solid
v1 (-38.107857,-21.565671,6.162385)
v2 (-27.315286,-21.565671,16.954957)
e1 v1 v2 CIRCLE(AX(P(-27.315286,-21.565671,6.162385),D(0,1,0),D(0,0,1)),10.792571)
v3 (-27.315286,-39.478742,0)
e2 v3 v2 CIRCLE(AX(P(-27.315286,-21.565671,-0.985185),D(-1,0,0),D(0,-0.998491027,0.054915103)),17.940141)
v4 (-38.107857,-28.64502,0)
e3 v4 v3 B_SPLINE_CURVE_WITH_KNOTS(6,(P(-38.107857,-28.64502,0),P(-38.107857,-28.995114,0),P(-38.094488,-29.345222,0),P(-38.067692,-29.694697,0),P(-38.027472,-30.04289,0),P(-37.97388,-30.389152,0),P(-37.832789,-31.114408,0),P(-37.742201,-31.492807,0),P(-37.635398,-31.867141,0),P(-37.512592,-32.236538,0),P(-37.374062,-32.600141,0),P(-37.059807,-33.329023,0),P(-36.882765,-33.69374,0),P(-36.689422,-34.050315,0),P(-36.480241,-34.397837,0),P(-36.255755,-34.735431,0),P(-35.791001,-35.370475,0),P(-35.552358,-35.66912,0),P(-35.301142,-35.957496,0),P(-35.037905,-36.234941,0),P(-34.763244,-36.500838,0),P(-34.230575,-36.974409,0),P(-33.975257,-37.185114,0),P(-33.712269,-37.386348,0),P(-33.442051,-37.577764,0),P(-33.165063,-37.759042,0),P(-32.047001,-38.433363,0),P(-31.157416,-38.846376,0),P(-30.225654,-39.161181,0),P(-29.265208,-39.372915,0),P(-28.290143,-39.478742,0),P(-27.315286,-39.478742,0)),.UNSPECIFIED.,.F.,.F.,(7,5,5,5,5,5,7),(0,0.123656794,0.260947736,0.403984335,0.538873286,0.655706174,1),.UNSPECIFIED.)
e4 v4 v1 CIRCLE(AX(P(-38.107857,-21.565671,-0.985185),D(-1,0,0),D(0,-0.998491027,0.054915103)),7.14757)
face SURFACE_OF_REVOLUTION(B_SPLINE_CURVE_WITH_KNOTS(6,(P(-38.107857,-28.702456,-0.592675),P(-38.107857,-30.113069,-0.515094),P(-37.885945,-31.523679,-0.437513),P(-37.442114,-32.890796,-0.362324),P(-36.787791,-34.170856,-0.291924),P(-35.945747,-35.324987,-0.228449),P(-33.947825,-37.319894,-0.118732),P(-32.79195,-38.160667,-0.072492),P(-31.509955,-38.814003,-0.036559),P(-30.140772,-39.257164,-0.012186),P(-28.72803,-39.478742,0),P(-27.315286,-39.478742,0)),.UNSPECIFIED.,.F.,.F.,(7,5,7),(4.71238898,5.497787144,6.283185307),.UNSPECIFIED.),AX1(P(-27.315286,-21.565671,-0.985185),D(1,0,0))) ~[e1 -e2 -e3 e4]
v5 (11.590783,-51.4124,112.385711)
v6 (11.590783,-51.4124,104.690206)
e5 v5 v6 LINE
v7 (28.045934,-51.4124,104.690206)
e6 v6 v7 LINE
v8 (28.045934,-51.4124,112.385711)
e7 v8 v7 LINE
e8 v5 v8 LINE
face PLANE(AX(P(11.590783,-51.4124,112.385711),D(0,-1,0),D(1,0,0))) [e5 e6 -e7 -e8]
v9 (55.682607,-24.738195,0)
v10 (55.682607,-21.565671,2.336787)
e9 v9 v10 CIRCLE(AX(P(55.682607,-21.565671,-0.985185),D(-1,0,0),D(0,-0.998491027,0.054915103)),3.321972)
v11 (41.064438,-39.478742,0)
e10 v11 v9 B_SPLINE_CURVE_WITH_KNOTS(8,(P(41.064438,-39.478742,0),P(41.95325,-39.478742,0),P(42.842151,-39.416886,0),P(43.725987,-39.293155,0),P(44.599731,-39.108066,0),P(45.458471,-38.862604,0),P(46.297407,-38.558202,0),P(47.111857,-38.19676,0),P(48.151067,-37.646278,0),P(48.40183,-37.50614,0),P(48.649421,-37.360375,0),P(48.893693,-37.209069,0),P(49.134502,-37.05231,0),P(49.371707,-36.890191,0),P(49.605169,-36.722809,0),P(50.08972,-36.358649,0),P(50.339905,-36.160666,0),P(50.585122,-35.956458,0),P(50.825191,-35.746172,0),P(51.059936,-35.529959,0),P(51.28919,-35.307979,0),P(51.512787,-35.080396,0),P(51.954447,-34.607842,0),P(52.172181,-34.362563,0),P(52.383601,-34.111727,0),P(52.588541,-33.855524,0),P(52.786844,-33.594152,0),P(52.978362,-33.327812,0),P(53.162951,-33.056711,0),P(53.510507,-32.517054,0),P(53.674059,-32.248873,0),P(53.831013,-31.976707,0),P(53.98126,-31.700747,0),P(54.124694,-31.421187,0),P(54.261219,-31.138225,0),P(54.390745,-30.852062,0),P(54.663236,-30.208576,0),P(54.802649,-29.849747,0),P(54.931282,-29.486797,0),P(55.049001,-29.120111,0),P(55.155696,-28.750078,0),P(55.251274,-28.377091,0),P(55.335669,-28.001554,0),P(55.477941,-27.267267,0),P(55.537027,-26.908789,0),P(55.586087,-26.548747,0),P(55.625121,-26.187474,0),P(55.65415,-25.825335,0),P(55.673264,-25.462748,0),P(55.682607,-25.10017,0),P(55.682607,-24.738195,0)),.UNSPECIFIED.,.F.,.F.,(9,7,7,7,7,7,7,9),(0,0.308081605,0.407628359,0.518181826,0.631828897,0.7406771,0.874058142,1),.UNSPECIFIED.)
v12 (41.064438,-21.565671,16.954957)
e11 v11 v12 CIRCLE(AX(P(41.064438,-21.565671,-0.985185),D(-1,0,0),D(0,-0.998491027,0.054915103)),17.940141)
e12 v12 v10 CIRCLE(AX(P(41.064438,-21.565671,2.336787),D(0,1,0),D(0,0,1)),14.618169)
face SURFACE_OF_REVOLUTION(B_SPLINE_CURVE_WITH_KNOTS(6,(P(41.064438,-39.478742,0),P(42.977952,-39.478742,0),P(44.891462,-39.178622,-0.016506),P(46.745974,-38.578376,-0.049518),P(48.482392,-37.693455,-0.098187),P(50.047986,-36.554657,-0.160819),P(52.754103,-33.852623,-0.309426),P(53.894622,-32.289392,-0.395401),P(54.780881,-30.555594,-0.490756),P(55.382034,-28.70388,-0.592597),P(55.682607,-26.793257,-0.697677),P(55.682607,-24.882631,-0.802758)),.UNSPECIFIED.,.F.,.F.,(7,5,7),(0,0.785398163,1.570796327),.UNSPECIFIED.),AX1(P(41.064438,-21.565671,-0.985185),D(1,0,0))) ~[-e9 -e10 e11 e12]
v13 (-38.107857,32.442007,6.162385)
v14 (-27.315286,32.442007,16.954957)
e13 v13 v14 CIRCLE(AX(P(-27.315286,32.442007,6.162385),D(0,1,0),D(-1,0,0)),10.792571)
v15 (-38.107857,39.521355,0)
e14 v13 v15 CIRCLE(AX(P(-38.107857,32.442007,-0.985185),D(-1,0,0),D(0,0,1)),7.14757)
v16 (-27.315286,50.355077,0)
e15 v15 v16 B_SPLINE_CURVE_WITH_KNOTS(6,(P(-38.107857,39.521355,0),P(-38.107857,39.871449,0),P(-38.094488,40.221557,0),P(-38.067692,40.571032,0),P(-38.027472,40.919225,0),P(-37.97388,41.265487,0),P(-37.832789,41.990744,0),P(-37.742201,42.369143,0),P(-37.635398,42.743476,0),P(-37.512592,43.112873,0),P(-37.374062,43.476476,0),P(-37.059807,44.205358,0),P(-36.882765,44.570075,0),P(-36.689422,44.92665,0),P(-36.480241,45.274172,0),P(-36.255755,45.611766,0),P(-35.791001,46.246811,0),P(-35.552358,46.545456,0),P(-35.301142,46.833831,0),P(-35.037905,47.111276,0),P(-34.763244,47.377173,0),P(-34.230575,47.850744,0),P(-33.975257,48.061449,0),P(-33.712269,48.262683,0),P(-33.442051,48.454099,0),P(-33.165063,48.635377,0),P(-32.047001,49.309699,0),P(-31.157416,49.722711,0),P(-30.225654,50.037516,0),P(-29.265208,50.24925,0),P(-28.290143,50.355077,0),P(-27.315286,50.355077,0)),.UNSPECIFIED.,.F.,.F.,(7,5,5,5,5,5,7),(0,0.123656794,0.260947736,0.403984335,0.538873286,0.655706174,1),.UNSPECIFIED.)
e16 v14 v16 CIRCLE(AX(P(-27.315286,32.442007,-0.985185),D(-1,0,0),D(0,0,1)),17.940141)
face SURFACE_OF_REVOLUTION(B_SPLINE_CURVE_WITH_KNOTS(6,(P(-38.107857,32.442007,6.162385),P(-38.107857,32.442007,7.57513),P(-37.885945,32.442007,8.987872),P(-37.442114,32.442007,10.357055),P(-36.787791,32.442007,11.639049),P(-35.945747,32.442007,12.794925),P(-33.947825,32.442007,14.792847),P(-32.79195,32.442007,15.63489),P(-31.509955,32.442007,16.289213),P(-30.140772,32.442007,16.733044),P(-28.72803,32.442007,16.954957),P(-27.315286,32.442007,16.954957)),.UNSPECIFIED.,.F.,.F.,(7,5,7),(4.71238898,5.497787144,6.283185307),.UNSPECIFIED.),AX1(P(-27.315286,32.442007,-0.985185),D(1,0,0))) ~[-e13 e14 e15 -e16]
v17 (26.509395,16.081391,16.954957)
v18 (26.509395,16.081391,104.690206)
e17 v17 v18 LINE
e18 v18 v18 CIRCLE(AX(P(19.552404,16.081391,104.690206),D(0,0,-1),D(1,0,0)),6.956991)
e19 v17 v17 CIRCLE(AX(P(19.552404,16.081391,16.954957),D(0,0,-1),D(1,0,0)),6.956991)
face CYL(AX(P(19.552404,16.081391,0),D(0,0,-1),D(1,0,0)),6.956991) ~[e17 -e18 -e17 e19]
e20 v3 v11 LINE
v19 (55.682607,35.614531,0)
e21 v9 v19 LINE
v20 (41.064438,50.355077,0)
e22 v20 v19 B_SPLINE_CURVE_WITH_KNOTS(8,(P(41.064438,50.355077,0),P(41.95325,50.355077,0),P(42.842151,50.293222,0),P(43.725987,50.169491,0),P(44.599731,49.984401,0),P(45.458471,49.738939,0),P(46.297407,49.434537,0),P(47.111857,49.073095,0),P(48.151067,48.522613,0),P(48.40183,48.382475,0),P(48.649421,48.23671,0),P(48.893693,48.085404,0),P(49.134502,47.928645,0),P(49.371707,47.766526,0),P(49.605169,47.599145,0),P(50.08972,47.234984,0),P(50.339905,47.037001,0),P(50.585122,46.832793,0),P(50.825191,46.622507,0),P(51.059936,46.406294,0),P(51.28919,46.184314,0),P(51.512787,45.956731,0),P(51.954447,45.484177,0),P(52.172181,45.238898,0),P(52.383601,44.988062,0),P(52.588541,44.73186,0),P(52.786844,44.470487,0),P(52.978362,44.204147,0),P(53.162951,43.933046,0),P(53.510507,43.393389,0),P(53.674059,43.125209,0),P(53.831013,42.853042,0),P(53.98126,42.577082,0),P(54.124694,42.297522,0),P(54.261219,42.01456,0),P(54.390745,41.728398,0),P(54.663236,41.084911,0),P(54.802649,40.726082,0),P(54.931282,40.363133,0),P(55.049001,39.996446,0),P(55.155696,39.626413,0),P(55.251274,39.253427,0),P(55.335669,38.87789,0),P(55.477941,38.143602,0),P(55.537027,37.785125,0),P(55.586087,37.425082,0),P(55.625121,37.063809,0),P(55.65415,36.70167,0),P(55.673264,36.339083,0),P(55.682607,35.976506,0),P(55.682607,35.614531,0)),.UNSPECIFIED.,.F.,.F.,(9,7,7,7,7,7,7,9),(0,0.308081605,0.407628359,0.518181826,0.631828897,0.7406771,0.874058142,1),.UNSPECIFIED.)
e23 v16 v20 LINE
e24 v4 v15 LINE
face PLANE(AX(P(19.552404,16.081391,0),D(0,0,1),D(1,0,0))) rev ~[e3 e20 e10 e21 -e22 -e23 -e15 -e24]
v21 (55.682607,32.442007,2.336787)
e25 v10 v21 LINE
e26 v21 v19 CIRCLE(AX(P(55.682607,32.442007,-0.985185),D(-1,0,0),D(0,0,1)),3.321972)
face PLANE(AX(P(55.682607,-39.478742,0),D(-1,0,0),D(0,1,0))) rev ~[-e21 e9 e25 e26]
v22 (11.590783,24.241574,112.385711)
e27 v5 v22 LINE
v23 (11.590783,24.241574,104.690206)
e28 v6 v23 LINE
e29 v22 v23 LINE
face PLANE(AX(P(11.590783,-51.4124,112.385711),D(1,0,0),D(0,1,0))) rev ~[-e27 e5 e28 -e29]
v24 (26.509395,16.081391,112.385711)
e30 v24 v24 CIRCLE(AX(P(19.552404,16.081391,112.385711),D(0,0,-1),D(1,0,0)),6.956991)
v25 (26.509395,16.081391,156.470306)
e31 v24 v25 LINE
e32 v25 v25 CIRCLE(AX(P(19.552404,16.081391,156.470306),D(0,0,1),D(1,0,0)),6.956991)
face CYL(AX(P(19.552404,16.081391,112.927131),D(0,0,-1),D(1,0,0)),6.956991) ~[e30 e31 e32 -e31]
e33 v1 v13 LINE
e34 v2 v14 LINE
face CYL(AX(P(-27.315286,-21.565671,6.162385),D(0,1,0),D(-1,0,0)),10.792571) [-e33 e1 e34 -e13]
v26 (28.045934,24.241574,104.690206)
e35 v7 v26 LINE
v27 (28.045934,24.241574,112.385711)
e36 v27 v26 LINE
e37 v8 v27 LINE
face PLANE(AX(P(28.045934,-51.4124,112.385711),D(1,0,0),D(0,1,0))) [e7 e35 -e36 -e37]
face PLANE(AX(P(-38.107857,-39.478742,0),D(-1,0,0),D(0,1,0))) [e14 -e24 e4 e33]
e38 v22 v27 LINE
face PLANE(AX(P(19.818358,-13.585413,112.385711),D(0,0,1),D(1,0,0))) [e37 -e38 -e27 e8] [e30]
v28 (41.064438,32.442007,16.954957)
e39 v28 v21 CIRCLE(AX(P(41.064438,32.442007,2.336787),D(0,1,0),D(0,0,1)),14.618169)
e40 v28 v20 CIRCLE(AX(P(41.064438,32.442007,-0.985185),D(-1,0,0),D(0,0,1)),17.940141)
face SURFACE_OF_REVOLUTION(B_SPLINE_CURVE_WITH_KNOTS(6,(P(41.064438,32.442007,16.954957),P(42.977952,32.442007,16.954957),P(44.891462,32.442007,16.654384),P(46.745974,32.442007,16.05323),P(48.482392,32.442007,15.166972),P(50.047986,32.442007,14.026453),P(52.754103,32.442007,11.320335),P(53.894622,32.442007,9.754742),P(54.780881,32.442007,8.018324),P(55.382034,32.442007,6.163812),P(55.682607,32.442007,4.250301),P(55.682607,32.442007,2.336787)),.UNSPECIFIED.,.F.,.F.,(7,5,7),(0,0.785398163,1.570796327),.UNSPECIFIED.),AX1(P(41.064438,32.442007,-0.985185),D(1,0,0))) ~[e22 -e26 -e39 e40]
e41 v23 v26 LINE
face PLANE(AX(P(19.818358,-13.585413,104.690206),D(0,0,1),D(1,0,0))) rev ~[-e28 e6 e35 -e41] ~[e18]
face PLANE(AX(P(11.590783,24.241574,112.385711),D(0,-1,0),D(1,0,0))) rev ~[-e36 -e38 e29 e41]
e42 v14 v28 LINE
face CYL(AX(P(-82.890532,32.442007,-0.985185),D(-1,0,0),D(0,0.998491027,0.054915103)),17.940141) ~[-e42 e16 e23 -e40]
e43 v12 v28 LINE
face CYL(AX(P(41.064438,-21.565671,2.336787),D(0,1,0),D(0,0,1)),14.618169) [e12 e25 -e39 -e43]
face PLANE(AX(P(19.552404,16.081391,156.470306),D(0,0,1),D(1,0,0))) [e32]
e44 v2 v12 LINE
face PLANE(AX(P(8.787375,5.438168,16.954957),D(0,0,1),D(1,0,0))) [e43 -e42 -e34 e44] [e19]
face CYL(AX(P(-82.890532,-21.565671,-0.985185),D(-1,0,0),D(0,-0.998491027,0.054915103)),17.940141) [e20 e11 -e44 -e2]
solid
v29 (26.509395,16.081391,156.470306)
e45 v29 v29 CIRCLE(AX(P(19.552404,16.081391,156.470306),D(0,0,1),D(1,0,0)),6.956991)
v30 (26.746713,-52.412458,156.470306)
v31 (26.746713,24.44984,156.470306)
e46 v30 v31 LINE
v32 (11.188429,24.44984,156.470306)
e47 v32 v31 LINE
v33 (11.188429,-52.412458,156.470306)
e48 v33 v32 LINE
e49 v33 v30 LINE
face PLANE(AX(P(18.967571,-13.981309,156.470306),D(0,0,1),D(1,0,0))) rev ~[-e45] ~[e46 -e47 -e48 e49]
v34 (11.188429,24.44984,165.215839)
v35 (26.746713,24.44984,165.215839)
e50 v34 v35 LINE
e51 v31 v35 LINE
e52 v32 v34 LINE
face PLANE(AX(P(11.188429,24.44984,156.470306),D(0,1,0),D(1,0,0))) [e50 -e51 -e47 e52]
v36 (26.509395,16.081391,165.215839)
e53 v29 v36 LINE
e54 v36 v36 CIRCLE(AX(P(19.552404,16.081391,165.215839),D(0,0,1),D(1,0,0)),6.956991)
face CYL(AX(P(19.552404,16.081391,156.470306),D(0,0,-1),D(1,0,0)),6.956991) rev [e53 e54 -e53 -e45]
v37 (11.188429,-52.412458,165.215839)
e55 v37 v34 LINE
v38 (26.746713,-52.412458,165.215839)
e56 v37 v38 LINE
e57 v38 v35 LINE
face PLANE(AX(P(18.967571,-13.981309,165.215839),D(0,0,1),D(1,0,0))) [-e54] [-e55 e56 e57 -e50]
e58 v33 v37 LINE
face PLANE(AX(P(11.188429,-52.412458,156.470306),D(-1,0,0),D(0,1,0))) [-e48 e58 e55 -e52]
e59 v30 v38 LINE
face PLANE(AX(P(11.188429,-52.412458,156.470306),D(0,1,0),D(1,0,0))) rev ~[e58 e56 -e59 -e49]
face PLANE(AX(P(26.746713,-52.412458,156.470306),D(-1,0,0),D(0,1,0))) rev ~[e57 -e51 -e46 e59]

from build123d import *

# Parameters (mm, degrees)
F0_W        = 93.7904641032
F0_H        = 89.8338183761
F1_DEPTH    = 16.9549565762
F2_T1_DEPTH = 183.3558146052
F3_R        = 10.7925712466
F4_R        = 14.6181693704
F5_R        = 6.9569907431
F6_DEPTH    = 112.9271313548
F8_W        = 16.4551511407
F8_H        = 75.6539739668
F9_DEPTH    = 7.6955053955
F10_DEPTH   = 43.5431748629
F11_W       = 15.558283776
F11_H       = 76.8622979522
F11_R       = 6.9569907431
F12_DEPTH   = 8.7455324829


# Not quite as in the source:
# - a fillet or chamfer that OpenCascade refuses, or shapes differently, is made with other operations: its cross-section is extruded or revolved along the edge and cut away or added


with BuildPart() as f1:
    # F0 (on Top) → F1 (new body)
    with BuildSketch(Plane.XY):
        with Locations((8.7873749435, 5.4381676018)):
            Rectangle(F0_W, F0_H)
    extrude(amount=F1_DEPTH)

    # F2: fillet of radius 17.9401412852 on 2 edges, made by hand

    # F2_s2 → F2_t1 (cut)
    with BuildSketch(Plane.YZ.offset(-82.8905323591)):
        with BuildLine():
            ThreePointArc((-39.4787415862, 0), (-33.8980337182, 12.0440712599), (-21.5656714858, 16.9549565762))
            Line((-21.5656714858, 16.9549565762), (-39.4787415862, 16.9549565762))
            Line((-39.4787415862, 16.9549565762), (-39.4787415862, 0))
        make_face()
        with BuildLine():
            ThreePointArc((50.3550767899, 0), (44.7743689219, 12.0440712599), (32.4420066895, 16.9549565762))
            Line((32.4420066895, 16.9549565762), (50.3550767899, 16.9549565762))
            Line((50.3550767899, 16.9549565762), (50.3550767899, 0))
        make_face()
    extrude(amount=F2_T1_DEPTH, mode=Mode.SUBTRACT)

    # F3
    f3_edges = [f1.edges().sort_by_distance(p)[0] for p in [
        (-38.107857, 5.438168, 16.954957),
        (-38.107857, -33.898034, 12.044071),
        (-38.107857, 44.774369, 12.044071),
    ]]
    fillet(f3_edges, radius=F3_R)

    # F4
    f4_edges = [f1.edges().sort_by_distance(p)[0] for p in [
        (55.682607, 44.774369, 12.044071),
        (55.682607, 5.438168, 16.954957),
        (55.682607, -33.898034, 12.044071),
    ]]
    fillet(f4_edges, radius=F4_R)

    # F5 (on Top) → F6 (join)
    with BuildSketch(Plane.XY):
        with Locations((19.552404061, 16.0813909024)):
            Circle(F5_R)
    extrude(amount=F6_DEPTH)

    # F8 (on offset) → F9 (join)
    with BuildSketch(Plane.XY.offset(112.385711167)):
        with Locations((19.8183581233, -13.5854128748)):
            Rectangle(F8_W, F8_H)
    extrude(amount=-F9_DEPTH)

    # F10 (add): a face of the model
    f10_faces = [f1.faces().sort_by_distance(p)[0] for p in [
        (19.552404061, 16.0813909024, 112.9271313548),
    ]]
    extrude(f10_faces, amount=F10_DEPTH)


with BuildPart() as f12:
    # F11 (on face) → F12 (new body)
    with BuildSketch(Plane.XY.offset(156.4703062177)):
        with Locations((18.967570737, -13.9813087881)):
            Rectangle(F11_W, F11_H)
        with Locations((19.552404061, 16.0813909024)):
            Circle(F11_R, mode=Mode.SUBTRACT)
    extrude(amount=F12_DEPTH)


solid = Compound([f1.part, f12.part])
